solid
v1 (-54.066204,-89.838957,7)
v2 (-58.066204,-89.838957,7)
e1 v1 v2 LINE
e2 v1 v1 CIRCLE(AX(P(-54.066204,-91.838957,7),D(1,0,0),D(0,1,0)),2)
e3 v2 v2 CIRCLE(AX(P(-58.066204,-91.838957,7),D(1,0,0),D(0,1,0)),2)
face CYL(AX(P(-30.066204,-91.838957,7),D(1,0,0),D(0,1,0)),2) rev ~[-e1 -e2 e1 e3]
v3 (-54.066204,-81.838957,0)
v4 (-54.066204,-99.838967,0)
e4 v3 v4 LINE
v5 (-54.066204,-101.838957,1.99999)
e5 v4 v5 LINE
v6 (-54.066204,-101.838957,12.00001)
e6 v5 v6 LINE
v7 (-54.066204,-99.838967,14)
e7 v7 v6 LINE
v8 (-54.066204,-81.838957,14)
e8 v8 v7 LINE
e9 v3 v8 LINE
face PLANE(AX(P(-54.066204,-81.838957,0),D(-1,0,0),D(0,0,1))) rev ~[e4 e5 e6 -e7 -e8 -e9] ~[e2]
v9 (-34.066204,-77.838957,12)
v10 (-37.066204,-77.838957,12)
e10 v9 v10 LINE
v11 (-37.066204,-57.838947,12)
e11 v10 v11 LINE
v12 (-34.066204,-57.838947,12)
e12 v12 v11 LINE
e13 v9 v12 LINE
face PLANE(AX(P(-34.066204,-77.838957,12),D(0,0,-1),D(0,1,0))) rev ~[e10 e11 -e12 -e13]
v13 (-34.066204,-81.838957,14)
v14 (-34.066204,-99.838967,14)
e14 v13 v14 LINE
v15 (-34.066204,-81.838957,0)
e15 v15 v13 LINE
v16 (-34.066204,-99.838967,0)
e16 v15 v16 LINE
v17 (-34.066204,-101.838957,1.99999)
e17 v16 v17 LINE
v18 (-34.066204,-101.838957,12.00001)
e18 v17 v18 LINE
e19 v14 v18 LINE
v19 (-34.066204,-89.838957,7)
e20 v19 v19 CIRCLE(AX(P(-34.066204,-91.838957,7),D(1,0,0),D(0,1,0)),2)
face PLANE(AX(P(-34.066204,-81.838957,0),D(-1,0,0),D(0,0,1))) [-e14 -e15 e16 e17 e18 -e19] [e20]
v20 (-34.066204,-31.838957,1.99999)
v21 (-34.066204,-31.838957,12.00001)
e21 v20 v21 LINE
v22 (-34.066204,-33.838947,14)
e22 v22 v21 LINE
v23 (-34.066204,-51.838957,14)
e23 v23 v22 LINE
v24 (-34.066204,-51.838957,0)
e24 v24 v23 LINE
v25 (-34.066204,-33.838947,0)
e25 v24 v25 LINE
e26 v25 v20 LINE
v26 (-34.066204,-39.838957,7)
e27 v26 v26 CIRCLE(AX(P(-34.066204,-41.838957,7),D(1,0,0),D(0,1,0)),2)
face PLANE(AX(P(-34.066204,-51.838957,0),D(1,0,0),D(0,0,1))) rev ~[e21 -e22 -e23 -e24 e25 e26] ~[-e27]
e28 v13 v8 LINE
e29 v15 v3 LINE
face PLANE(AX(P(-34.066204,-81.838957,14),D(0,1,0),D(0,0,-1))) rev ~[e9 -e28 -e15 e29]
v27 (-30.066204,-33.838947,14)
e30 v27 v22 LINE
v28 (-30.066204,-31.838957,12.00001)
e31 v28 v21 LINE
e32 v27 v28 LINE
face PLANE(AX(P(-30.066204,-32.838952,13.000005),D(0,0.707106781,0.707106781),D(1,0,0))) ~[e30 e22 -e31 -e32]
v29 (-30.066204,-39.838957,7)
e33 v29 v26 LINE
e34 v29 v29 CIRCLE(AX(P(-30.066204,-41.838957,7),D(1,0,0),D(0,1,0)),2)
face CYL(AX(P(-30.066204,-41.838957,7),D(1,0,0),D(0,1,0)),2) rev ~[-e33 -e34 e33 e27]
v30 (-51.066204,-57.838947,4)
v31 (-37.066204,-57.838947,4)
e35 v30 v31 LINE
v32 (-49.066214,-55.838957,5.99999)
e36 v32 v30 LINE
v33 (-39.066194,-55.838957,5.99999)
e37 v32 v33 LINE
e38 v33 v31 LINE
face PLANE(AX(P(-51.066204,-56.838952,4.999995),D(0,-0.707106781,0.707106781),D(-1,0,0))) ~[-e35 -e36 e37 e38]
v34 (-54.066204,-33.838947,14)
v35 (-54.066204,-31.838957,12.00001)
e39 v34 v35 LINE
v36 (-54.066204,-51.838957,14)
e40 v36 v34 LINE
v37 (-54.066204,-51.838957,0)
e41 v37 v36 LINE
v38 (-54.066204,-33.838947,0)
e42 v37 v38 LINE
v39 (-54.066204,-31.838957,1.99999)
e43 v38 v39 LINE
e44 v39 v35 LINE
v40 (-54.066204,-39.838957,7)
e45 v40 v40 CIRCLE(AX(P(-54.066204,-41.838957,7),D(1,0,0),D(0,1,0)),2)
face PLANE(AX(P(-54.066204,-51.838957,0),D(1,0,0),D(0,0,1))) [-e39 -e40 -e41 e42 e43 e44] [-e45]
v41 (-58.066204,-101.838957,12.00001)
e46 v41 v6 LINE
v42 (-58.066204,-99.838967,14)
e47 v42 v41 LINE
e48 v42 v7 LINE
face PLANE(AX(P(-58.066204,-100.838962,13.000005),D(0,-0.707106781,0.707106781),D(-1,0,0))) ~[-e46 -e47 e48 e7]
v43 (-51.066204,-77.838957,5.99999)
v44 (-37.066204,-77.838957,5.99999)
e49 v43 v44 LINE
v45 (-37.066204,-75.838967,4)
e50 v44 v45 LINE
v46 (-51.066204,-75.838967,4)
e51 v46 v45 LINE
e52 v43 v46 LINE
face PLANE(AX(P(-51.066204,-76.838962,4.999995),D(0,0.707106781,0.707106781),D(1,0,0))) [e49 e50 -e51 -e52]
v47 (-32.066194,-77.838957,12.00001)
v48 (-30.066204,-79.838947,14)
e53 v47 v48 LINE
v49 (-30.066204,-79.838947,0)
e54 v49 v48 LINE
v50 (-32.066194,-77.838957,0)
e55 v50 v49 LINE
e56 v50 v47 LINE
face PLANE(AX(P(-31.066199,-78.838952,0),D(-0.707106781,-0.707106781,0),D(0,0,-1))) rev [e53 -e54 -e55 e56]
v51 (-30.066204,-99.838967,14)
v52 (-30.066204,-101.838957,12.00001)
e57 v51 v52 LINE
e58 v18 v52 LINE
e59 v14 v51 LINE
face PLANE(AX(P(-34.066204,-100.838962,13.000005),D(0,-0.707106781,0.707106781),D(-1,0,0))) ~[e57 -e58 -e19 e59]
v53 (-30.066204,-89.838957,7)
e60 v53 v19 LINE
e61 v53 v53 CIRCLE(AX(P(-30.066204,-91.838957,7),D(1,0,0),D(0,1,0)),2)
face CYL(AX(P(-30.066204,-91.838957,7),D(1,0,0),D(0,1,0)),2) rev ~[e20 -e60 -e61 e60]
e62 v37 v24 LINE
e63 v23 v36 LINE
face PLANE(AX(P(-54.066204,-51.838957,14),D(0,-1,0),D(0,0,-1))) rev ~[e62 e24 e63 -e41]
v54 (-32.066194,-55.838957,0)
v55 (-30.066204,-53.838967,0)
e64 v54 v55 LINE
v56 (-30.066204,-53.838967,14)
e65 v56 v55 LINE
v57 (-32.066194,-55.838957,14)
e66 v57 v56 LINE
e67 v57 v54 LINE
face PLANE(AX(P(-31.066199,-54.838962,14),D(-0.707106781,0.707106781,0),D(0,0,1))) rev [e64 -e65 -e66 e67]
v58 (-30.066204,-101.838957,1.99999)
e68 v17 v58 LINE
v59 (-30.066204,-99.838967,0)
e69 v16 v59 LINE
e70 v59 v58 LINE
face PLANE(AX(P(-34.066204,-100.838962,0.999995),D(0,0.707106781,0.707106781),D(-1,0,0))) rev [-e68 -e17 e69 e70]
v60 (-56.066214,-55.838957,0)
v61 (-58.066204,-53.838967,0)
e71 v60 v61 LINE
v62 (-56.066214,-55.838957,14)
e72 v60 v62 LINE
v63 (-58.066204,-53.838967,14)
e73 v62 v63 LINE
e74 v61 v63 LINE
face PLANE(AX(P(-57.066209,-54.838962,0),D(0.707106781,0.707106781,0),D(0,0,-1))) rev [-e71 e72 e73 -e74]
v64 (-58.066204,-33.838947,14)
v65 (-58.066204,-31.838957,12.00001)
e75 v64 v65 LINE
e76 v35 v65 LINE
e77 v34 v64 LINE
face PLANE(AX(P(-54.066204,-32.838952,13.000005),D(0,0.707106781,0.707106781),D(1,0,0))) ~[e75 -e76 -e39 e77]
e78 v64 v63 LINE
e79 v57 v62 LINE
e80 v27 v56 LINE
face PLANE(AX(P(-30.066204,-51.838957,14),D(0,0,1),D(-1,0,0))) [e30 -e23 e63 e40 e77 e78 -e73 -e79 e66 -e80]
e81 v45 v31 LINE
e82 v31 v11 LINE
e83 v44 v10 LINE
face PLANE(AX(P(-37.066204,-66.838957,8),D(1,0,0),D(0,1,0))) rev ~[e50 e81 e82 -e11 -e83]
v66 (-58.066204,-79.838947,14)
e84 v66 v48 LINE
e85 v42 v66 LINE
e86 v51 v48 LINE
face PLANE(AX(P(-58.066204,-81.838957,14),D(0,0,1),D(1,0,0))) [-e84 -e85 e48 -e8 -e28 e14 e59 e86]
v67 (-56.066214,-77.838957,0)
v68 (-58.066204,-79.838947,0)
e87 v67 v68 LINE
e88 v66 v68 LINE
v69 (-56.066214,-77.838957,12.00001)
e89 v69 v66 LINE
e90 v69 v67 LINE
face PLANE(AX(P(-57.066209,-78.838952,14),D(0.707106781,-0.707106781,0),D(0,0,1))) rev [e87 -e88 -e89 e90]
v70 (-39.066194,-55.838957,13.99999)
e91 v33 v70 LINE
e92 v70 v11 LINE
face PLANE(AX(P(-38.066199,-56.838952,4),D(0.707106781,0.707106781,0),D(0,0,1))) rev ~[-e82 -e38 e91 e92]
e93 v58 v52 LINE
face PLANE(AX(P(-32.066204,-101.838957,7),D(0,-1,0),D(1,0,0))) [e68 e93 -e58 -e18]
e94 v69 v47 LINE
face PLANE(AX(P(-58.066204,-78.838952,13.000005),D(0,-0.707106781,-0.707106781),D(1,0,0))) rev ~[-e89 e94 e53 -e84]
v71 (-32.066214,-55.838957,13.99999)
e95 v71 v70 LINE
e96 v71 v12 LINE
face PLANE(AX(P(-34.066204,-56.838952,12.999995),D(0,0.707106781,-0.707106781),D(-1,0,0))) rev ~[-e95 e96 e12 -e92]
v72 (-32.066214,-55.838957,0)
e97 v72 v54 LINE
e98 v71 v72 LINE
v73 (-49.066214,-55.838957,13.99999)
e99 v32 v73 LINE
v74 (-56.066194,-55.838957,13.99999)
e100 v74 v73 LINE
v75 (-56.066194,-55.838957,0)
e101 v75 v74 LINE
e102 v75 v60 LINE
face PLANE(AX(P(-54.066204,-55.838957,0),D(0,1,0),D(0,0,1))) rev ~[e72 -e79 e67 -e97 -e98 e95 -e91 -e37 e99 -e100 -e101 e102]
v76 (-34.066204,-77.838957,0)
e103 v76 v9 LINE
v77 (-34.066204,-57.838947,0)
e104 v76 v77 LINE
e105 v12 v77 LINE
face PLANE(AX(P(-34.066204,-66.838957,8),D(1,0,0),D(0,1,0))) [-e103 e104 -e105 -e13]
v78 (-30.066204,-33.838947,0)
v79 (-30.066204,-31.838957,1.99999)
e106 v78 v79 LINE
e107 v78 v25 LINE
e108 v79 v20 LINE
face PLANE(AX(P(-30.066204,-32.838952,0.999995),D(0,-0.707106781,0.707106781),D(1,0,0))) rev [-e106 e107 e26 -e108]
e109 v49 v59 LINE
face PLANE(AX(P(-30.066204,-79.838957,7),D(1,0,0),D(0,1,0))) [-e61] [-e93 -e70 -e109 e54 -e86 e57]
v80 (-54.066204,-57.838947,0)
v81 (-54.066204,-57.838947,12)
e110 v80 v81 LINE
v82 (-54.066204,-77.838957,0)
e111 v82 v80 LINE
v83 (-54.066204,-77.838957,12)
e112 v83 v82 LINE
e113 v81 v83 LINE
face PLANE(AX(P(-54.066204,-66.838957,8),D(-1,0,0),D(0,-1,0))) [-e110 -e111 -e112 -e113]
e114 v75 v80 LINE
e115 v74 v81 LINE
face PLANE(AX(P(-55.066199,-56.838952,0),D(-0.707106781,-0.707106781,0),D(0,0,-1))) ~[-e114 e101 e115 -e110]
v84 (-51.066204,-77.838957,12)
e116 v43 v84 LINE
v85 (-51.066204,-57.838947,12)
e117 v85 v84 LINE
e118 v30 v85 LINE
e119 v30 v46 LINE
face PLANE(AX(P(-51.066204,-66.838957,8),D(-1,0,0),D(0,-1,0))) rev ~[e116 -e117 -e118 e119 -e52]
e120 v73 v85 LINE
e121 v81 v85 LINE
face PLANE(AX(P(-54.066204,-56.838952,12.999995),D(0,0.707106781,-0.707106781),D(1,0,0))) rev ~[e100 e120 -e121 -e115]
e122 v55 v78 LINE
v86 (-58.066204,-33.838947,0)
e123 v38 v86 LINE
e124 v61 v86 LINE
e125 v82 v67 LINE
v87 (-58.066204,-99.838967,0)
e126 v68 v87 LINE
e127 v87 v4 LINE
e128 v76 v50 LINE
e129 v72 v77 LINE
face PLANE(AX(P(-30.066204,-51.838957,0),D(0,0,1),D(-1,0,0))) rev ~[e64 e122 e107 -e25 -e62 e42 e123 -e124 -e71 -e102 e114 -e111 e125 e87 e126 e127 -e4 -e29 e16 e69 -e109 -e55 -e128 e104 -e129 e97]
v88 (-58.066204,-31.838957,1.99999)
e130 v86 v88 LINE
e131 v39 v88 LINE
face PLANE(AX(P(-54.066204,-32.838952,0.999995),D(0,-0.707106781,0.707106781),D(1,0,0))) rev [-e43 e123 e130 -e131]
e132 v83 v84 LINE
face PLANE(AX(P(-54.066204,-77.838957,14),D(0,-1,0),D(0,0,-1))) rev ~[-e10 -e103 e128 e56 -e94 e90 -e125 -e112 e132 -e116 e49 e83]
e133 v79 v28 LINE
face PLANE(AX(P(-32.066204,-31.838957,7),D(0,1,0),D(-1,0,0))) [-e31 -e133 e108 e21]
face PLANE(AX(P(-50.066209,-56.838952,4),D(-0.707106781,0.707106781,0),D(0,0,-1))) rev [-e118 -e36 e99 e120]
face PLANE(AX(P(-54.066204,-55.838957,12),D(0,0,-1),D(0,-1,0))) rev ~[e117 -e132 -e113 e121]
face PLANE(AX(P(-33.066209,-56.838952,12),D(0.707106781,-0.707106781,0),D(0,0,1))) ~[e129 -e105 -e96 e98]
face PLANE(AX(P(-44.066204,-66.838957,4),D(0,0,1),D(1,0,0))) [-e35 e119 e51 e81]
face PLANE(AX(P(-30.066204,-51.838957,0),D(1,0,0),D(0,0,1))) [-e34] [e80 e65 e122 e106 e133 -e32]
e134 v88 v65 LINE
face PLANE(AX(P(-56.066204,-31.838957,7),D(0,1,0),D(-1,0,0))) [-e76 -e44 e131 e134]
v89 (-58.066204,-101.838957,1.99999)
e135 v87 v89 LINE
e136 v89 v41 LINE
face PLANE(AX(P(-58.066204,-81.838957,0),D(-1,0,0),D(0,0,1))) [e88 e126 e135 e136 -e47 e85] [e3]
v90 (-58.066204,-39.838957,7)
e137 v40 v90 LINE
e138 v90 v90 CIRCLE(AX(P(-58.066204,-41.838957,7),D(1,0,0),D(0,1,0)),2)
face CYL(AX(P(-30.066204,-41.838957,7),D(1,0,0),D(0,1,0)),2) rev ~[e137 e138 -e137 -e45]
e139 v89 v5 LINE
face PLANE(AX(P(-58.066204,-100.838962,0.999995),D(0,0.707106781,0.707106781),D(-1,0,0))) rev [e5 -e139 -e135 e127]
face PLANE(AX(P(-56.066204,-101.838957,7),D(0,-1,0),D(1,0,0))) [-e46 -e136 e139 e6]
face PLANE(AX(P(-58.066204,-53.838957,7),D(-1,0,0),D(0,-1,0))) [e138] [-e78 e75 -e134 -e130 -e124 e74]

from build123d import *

# Parameters (mm, degrees)
F0_W            = 20
F0_H            = 22
F0_H_2          = 4
F0_H_3          = 20.4
F1_DEPTH        = 2
F2_DEPTH        = 10
F3_R            = 2.2
F4_DEPTH        = 30
F5_W            = 20
F5_H            = 12
F5_R            = 2.6
F7_DEPTH        = 4
F6_W            = 20
F6_H            = 12
F6_R            = 2.6
F8_DEPTH        = 4
F9_T1_DEPTH     = 25
F9_T3_DEPTH     = 57.4
F9_T5_DEPTH     = 16
F9_T7_DEPTH     = 48.4
F9_T9_DEPTH     = 2
F9_T11_DEPTH    = 20
F9_T13_DEPTH    = 7
F9_T15_DEPTH    = 25
F9_T17_DEPTH    = 14
F9_T19_DEPTH    = 27
F9_T21_DEPTH    = 14
F9_T23_DEPTH    = 30
F9_T25_DEPTH    = 7
F9_T27_DEPTH    = 8
F9_S31_W        = 2
F9_S31_H        = 2
F9_T32_DEPTH    = 2
F9_S37_W        = 2
F9_S37_H        = 2
F9_T38_DEPTH    = 2
F9_S43_W        = 2
F9_S43_H        = 2
F9_T44_DEPTH    = 2
F9_S49_W        = 2
F9_S49_H        = 2
F9_T50_DEPTH    = 2
F9_S55_W        = 2
F9_S55_H        = 2
F9_T56_DEPTH    = 2
F9_S61_W        = 2
F9_S61_H        = 2
F9_T62_DEPTH    = 2
F9_S67_W        = 2
F9_S67_H        = 2
F9_T68_DEPTH    = 2
F9_S73_W        = 2
F9_S73_H        = 2
F9_T74_DEPTH    = 2
F9_T81_DEPTH    = 30
F9_T85_DEPTH    = 30
F9_T92_DEPTH    = 7
F9_T96_DEPTH    = 53.4
F9_T103_DEPTH   = 30
F9_T107_DEPTH   = 30
F9_S1_T1_DEPTH  = 7
F9_S1_T3_DEPTH  = 30
F9_S1_T5_DEPTH  = 16
F9_S1_T7_DEPTH  = 8
F9_S1_S11_W     = 2
F9_S1_S11_H     = 2
F9_S1_T12_DEPTH = 2
F9_S1_S17_W     = 2
F9_S1_S17_H     = 2
F9_S1_T18_DEPTH = 2
F9_S1_S23_W     = 2
F9_S1_S23_H     = 2
F9_S1_T24_DEPTH = 2
F9_S1_S29_W     = 2
F9_S1_S29_H     = 2
F9_S1_T30_DEPTH = 2
F10_W           = 20
F10_H           = 30
F11_DEPTH       = 4
F12_W           = 20
F12_H           = 4
F13_DEPTH       = 10
F16_DEPTH       = 4
F17_DEPTH       = 4
F19_W           = 4
F19_H           = 14
F20_DEPTH       = 20
F18_W           = 4
F18_H           = 14
F21_DEPTH       = 20
F22_W           = 22
F22_H           = 8
F23_DEPTH       = 3
F24_W           = 22
F24_H           = 8
F25_DEPTH       = 3
F26_R           = 2
F27_R           = 2
F28_DEPTH       = 28.3421242009
F29_SIZE        = 1.99999


# Not quite as in the source:
# - a fillet or chamfer that OpenCascade refuses, or shapes differently, is made with other operations: its cross-section is extruded or revolved along the edge and cut away or added
# - a fillet or chamfer is up to 0.001 mm smaller than in the source, because OpenCascade refuses the exact size
# - a feature names something its author has since deleted; it is built from what else it names


with BuildPart() as f1:
    # F0 (on Top) → F1 (new body)
    with BuildSketch(Plane.XY):
        with Locations((-44.4073281825, 48.6883277684)):
            Rectangle(F0_W, F0_H)
        with Locations((-44.4073281825, 61.6883277684)):
            Rectangle(F0_W, F0_H_2)
        with Locations((-44.4073281825, 35.6883277684)):
            Rectangle(F0_W, F0_H_2)
        with Locations((-44.4073281825, 23.4883277684)):
            Rectangle(F0_W, F0_H_3)
        with Locations((-44.4073281825, 11.2883277684)):
            Rectangle(F0_W, F0_H_2)
    extrude(amount=-F1_DEPTH)

    # F0 (on Top) → F2 (join)
    with BuildSketch(Plane.XY):
        with Locations((-44.4073281825, 35.6883277684)):
            Rectangle(F0_W, F0_H_2)
        with Locations((-44.4073281825, 61.6883277684)):
            Rectangle(F0_W, F0_H_2)
        with Locations((-44.4073281825, 11.2883277684)):
            Rectangle(F0_W, F0_H_2)
    extrude(amount=F2_DEPTH)

    # F3 (on face) → F4 (cut)
    with BuildSketch(Plane.XZ.offset(-9.2883277684)):
        with Locations((-44.4073281825, 5.5)):
            Circle(F3_R)
    extrude(amount=-F4_DEPTH, mode=Mode.SUBTRACT)

    # F5 (on face) → F7 (join)
    with BuildSketch(Plane(origin=(-54.4073281825, 0, 0), x_dir=(0, -1, 0), z_dir=(-1, 0, 0))):
        with Locations((-73.6883277684, 4)):
            Rectangle(F5_W, F5_H)
        with Locations((-73.6883277684, 4)):
            Circle(F5_R, mode=Mode.SUBTRACT)
    extrude(amount=F7_DEPTH)

    # F6 (on face) → F8 (join)
    with BuildSketch(Plane.YZ.offset(-34.4073281825)):
        with Locations((73.6883277684, 4)):
            Rectangle(F6_W, F6_H)
        with Locations((73.6883277684, 4)):
            Circle(F6_R, mode=Mode.SUBTRACT)
        Polygon((63.6883277684, 10), (59.6883277684, 10), (59.6883277684, 0), (59.6883277684, -2), (63.6883277684, -2), align=None)
    extrude(amount=F8_DEPTH)

    # F9: fillet of radius 2 on 26 edges, made by hand

    # F9_s2 → F9_t1 (cut)
    with BuildSketch(Plane.YZ.offset(-59.4073281825)):
        with BuildLine():
            ThreePointArc((63.6883277684, 0), (63.1025413308, -1.4142135624), (61.6883277684, -2))
            Line((61.6883277684, -2), (63.6883277684, -2))
            Line((63.6883277684, -2), (63.6883277684, 0))
        make_face()
        with BuildLine():
            ThreePointArc((63.6883277684, 8), (63.1025413308, 9.4142135624), (61.6883277684, 10))
            Line((61.6883277684, 10), (63.6883277684, 10))
            Line((63.6883277684, 10), (63.6883277684, 8))
        make_face()
    extrude(amount=F9_T1_DEPTH, mode=Mode.SUBTRACT)

    # F9_s4 → F9_t3 (cut)
    with BuildSketch(Plane.XZ.offset(-68.6883277684)):
        with BuildLine():
            ThreePointArc((-54.4073281825, 0), (-53.8215417448, -1.4142135624), (-52.4073281825, -2))
            Line((-52.4073281825, -2), (-54.4073281825, -2))
            Line((-54.4073281825, -2), (-54.4073281825, 0))
        make_face()
    extrude(amount=F9_T3_DEPTH, mode=Mode.SUBTRACT)

    # F9_s6 → F9_t5 (cut)
    with BuildSketch(Plane.YZ.offset(-52.4073281825)):
        with BuildLine():
            ThreePointArc((9.2883277684, 0), (9.8741142061, -1.4142135624), (11.2883277684, -2))
            Line((11.2883277684, -2), (9.2883277684, -2))
            Line((9.2883277684, -2), (9.2883277684, 0))
        make_face()
        with BuildLine():
            ThreePointArc((9.2883277684, 8), (9.8741142061, 9.4142135624), (11.2883277684, 10))
            Line((11.2883277684, 10), (9.2883277684, 10))
            Line((9.2883277684, 10), (9.2883277684, 8))
        make_face()
    extrude(amount=F9_T5_DEPTH, mode=Mode.SUBTRACT)

    # F9_s8 → F9_t7 (cut)
    with BuildSketch(Plane.XZ.offset(-59.6883277684)):
        with BuildLine():
            ThreePointArc((-34.4073281825, 0), (-34.9931146201, -1.4142135624), (-36.4073281825, -2))
            Line((-36.4073281825, -2), (-34.4073281825, -2))
            Line((-34.4073281825, -2), (-34.4073281825, 0))
        make_face()
    extrude(amount=F9_T7_DEPTH, mode=Mode.SUBTRACT)

    # F9_s10 → F9_t9 (cut)
    with BuildSketch(Plane.YZ.offset(-34.4073281825)):
        with BuildLine():
            ThreePointArc((59.6883277684, 0), (60.2741142061, -1.4142135624), (61.6883277684, -2))
            Line((61.6883277684, -2), (59.6883277684, -2))
            Line((59.6883277684, -2), (59.6883277684, 0))
        make_face()
    extrude(amount=F9_T9_DEPTH, mode=Mode.SUBTRACT)

    # F9_s12 → F9_t11 (cut)
    with BuildSketch(Plane.XZ.offset(-81.6883277684)):
        with BuildLine():
            ThreePointArc((-30.4073281825, 0), (-30.9931146201, -1.4142135624), (-32.4073281825, -2))
            Line((-32.4073281825, -2), (-30.4073281825, -2))
            Line((-30.4073281825, -2), (-30.4073281825, 0))
        make_face()
        with BuildLine():
            ThreePointArc((-30.4073281825, 8), (-30.9931146201, 9.4142135624), (-32.4073281825, 10))
            Line((-32.4073281825, 10), (-30.4073281825, 10))
            Line((-30.4073281825, 10), (-30.4073281825, 8))
        make_face()
    extrude(amount=F9_T11_DEPTH, mode=Mode.SUBTRACT)

    # F9_s14 → F9_t13 (cut)
    with BuildSketch(Plane.YZ.offset(-39.4073281825)):
        with BuildLine():
            ThreePointArc((83.6883277684, 0), (83.1025413308, -1.4142135624), (81.6883277684, -2))
            Line((81.6883277684, -2), (83.6883277684, -2))
            Line((83.6883277684, -2), (83.6883277684, 0))
        make_face()
        with BuildLine():
            ThreePointArc((83.6883277684, 8), (83.1025413308, 9.4142135624), (81.6883277684, 10))
            Line((81.6883277684, 10), (83.6883277684, 10))
            Line((83.6883277684, 10), (83.6883277684, 8))
        make_face()
    extrude(amount=F9_T13_DEPTH, mode=Mode.SUBTRACT)

    # F9_s16 → F9_t15 (cut)
    with BuildSketch(Plane.XZ.offset(-88.6883277684)):
        with BuildLine():
            ThreePointArc((-34.4073281825, 0), (-33.8215417448, -1.4142135624), (-32.4073281825, -2))
            Line((-32.4073281825, -2), (-34.4073281825, -2))
            Line((-34.4073281825, -2), (-34.4073281825, 0))
        make_face()
        with BuildLine():
            ThreePointArc((-34.4073281825, 8), (-33.8215417448, 9.4142135624), (-32.4073281825, 10))
            Line((-32.4073281825, 10), (-34.4073281825, 10))
            Line((-34.4073281825, 10), (-34.4073281825, 8))
        make_face()
    extrude(amount=F9_T15_DEPTH, mode=Mode.SUBTRACT)

    # F9_s18 → F9_t17 (cut)
    with BuildSketch(Plane.XZ.offset(-68.6883277684)):
        with BuildLine():
            ThreePointArc((-52.4073281825, 10), (-53.8215417448, 9.4142135624), (-54.4073281825, 8))
            Line((-54.4073281825, 8), (-54.4073281825, 10))
            Line((-54.4073281825, 10), (-52.4073281825, 10))
        make_face()
    extrude(amount=F9_T17_DEPTH, mode=Mode.SUBTRACT)

    # F9_s20 → F9_t19 (cut)
    with BuildSketch(Plane.YZ.offset(-59.4073281825)):
        with BuildLine():
            ThreePointArc((59.6883277684, 8), (60.2741142061, 9.4142135624), (61.6883277684, 10))
            Line((61.6883277684, 10), (59.6883277684, 10))
            Line((59.6883277684, 10), (59.6883277684, 8))
        make_face()
    extrude(amount=F9_T19_DEPTH, mode=Mode.SUBTRACT)

    # F9_s22 → F9_t21 (cut)
    with BuildSketch(Plane.XZ.offset(-42.6883277684)):
        with BuildLine():
            ThreePointArc((-52.4073281825, 10), (-53.8215417448, 9.4142135624), (-54.4073281825, 8))
            Line((-54.4073281825, 8), (-54.4073281825, 10))
            Line((-54.4073281825, 10), (-52.4073281825, 10))
        make_face()
        with BuildLine():
            ThreePointArc((-36.4073281825, 10), (-34.9931146201, 9.4142135624), (-34.4073281825, 8))
            Line((-34.4073281825, 8), (-34.4073281825, 10))
            Line((-34.4073281825, 10), (-36.4073281825, 10))
        make_face()
    extrude(amount=F9_T21_DEPTH, mode=Mode.SUBTRACT)

    # F9_s24 → F9_t23 (cut)
    with BuildSketch(Plane.YZ.offset(-59.4073281825)):
        with BuildLine():
            ThreePointArc((33.6883277684, 8), (34.2741142061, 9.4142135624), (35.6883277684, 10))
            Line((35.6883277684, 10), (33.6883277684, 10))
            Line((33.6883277684, 10), (33.6883277684, 8))
        make_face()
        with BuildLine():
            ThreePointArc((37.6883277684, 8), (37.1025413308, 9.4142135624), (35.6883277684, 10))
            Line((35.6883277684, 10), (37.6883277684, 10))
            Line((37.6883277684, 10), (37.6883277684, 8))
        make_face()
        with BuildLine():
            ThreePointArc((13.2883277684, 8), (12.7025413308, 9.4142135624), (11.2883277684, 10))
            Line((11.2883277684, 10), (13.2883277684, 10))
            Line((13.2883277684, 10), (13.2883277684, 8))
        make_face()
    extrude(amount=F9_T23_DEPTH, mode=Mode.SUBTRACT)

    # F9_s26 → F9_t25 (cut)
    with BuildSketch(Plane.XZ.offset(-18.2883277684)):
        with BuildLine():
            ThreePointArc((-36.4073281825, 10), (-34.9931146201, 9.4142135624), (-34.4073281825, 8))
            Line((-34.4073281825, 8), (-34.4073281825, 10))
            Line((-34.4073281825, 10), (-36.4073281825, 10))
        make_face()
        with BuildLine():
            ThreePointArc((-52.4073281825, 10), (-53.8215417448, 9.4142135624), (-54.4073281825, 8))
            Line((-54.4073281825, 8), (-54.4073281825, 10))
            Line((-54.4073281825, 10), (-52.4073281825, 10))
        make_face()
    extrude(amount=F9_T25_DEPTH, mode=Mode.SUBTRACT)

    # F9_s28 → F9_t27 (cut)
    with BuildSketch(Plane.XY):
        with BuildLine():
            ThreePointArc((-36.4073281825, 9.2883277684), (-34.9931146201, 9.8741142061), (-34.4073281825, 11.2883277684))
            Line((-34.4073281825, 11.2883277684), (-34.4073281825, 9.2883277684))
            Line((-34.4073281825, 9.2883277684), (-36.4073281825, 9.2883277684))
        make_face()
        with BuildLine():
            ThreePointArc((-52.4073281825, 9.2883277684), (-53.8215417448, 9.8741142061), (-54.4073281825, 11.2883277684))
            Line((-54.4073281825, 11.2883277684), (-54.4073281825, 9.2883277684))
            Line((-54.4073281825, 9.2883277684), (-52.4073281825, 9.2883277684))
        make_face()
        with BuildLine():
            ThreePointArc((-30.4073281825, 61.6883277684), (-30.9931146201, 60.2741142061), (-32.4073281825, 59.6883277684))
            Line((-32.4073281825, 59.6883277684), (-30.4073281825, 59.6883277684))
            Line((-30.4073281825, 59.6883277684), (-30.4073281825, 61.6883277684))
        make_face()
        with BuildLine():
            ThreePointArc((-30.4073281825, 81.6883277684), (-30.9931146201, 83.1025413308), (-32.4073281825, 83.6883277684))
            Line((-32.4073281825, 83.6883277684), (-30.4073281825, 83.6883277684))
            Line((-30.4073281825, 83.6883277684), (-30.4073281825, 81.6883277684))
        make_face()
    extrude(amount=F9_T27_DEPTH, mode=Mode.SUBTRACT)


with BuildPart() as f9_tool30:
    # F9_s31 → F9_t32 (new body)
    with BuildSketch(Plane.YZ.offset(-52.4073281825)):
        with Locations((10.2883277684, -1)):
            Rectangle(F9_S31_W, F9_S31_H)
    extrude(amount=-F9_T32_DEPTH)

    # F9_s33 → F9_t34 (revolve, cut)
    with BuildSketch(Plane(origin=(-52.4073281825, 11.2883277684, 0), x_dir=(0, 0.7071067812, 0.7071067812), z_dir=(0, -0.7071067812, 0.7071067812))):
        with BuildLine():
            ThreePointArc((0, -2), (2, 0), (0, 2))
            Line((0, 2), (0, -2))
        make_face()
    revolve(axis=Axis((-52.4073281825, 11.2883277684, 0), (-1, 0, 0)), mode=Mode.SUBTRACT)


with BuildPart() as f1_1:
    add(f1.part)

    # F9_t29: cut F9_tool30
    add(f9_tool30.part, mode=Mode.SUBTRACT)


with BuildPart() as f9_tool36:
    # F9_s37 → F9_t38 (new body)
    with BuildSketch(Plane.XY):
        with Locations((-35.4073281825, 10.2883277684)):
            Rectangle(F9_S37_W, F9_S37_H)
    extrude(amount=-F9_T38_DEPTH)

    # F9_s39 → F9_t40 (revolve, cut)
    with BuildSketch(Plane(origin=(-36.4073281825, 11.2883277684, 0), x_dir=(-0.7071067812, 0.7071067812, 0), z_dir=(-0.7071067812, -0.7071067812, 0))):
        with BuildLine():
            ThreePointArc((0, -2), (2, 0), (0, 2))
            Line((0, 2), (0, -2))
        make_face()
    revolve(axis=Axis((-36.4073281825, 11.2883277684, 0), (0, 0, -1)), mode=Mode.SUBTRACT)


with BuildPart() as f1_2:
    add(f1_1.part)

    # F9_t35: cut F9_tool36
    add(f9_tool36.part, mode=Mode.SUBTRACT)


with BuildPart() as f9_tool42:
    # F9_s43 → F9_t44 (new body)
    with BuildSketch(Plane.YZ.offset(-32.4073281825)):
        with Locations((60.6883277684, -1)):
            Rectangle(F9_S43_W, F9_S43_H)
    extrude(amount=F9_T44_DEPTH)

    # F9_s45 → F9_t46 (revolve, cut)
    with BuildSketch(Plane(origin=(-32.4073281825, 61.6883277684, 0), x_dir=(0, 0.7071067812, 0.7071067812), z_dir=(0, 0.7071067812, -0.7071067812))):
        with BuildLine():
            ThreePointArc((0, -2), (2, 0), (0, 2))
            Line((0, 2), (0, -2))
        make_face()
    revolve(axis=Axis((-32.4073281825, 61.6883277684, 0), (1, 0, 0)), mode=Mode.SUBTRACT)


with BuildPart() as f1_3:
    add(f1_2.part)

    # F9_t41: cut F9_tool42
    add(f9_tool42.part, mode=Mode.SUBTRACT)


with BuildPart() as f9_tool48:
    # F9_s49 → F9_t50 (new body)
    with BuildSketch(Plane.XY):
        with Locations((-31.4073281825, 82.6883277684)):
            Rectangle(F9_S49_W, F9_S49_H)
    extrude(amount=-F9_T50_DEPTH)

    # F9_s51 → F9_t52 (revolve, cut)
    with BuildSketch(Plane(origin=(-32.4073281825, 81.6883277684, 0), x_dir=(-0.7071067812, -0.7071067812, 0), z_dir=(0.7071067812, -0.7071067812, 0))):
        with BuildLine():
            ThreePointArc((0, -2), (2, 0), (0, 2))
            Line((0, 2), (0, -2))
        make_face()
    revolve(axis=Axis((-32.4073281825, 81.6883277684, 0), (0, 0, -1)), mode=Mode.SUBTRACT)


with BuildPart() as f1_4:
    add(f1_3.part)

    # F9_t47: cut F9_tool48
    add(f9_tool48.part, mode=Mode.SUBTRACT)


with BuildPart() as f9_tool54:
    # F9_s55 → F9_t56 (new body)
    with BuildSketch(Plane.XY.offset(8)):
        with Locations((-31.4073281825, 60.6883277684)):
            Rectangle(F9_S55_W, F9_S55_H)
    extrude(amount=F9_T56_DEPTH)

    # F9_s57 → F9_t58 (revolve, cut)
    with BuildSketch(Plane(origin=(-32.4073281825, 61.6883277684, 8), x_dir=(-0.7071067812, 0.7071067812, 0), z_dir=(0.7071067812, 0.7071067812, 0))):
        with BuildLine():
            ThreePointArc((0, -2), (2, 0), (0, 2))
            Line((0, 2), (0, -2))
        make_face()
    revolve(axis=Axis((-32.4073281825, 61.6883277684, 8), (0, 0, 1)), mode=Mode.SUBTRACT)


with BuildPart() as f1_5:
    add(f1_4.part)

    # F9_t53: cut F9_tool54
    add(f9_tool54.part, mode=Mode.SUBTRACT)


with BuildPart() as f9_tool60:
    # F9_s61 → F9_t62 (new body)
    with BuildSketch(Plane.XZ.offset(-81.6883277684)):
        with Locations((-31.4073281825, 9)):
            Rectangle(F9_S61_W, F9_S61_H)
    extrude(amount=-F9_T62_DEPTH)

    # F9_s63 → F9_t64 (revolve, cut)
    with BuildSketch(Plane(origin=(-32.4073281825, 81.6883277684, 8), x_dir=(-0.7071067812, 0, -0.7071067812), z_dir=(0.7071067812, 0, -0.7071067812))):
        with BuildLine():
            ThreePointArc((0, -2), (2, 0), (0, 2))
            Line((0, 2), (0, -2))
        make_face()
    revolve(axis=Axis((-32.4073281825, 81.6883277684, 8), (0, 1, 0)), mode=Mode.SUBTRACT)


with BuildPart() as f1_6:
    add(f1_5.part)

    # F9_t59: cut F9_tool60
    add(f9_tool60.part, mode=Mode.SUBTRACT)


with BuildPart() as f9_tool66:
    # F9_s67 → F9_t68 (new body)
    with BuildSketch(Plane.XZ.offset(-11.2883277684)):
        with Locations((-35.4073281825, 9)):
            Rectangle(F9_S67_W, F9_S67_H)
    extrude(amount=F9_T68_DEPTH)

    # F9_s69 → F9_t70 (revolve, cut)
    with BuildSketch(Plane(origin=(-36.4073281825, 11.2883277684, 8), x_dir=(-0.7071067812, 0, -0.7071067812), z_dir=(-0.7071067812, 0, 0.7071067812))):
        with BuildLine():
            ThreePointArc((0, -2), (2, 0), (0, 2))
            Line((0, 2), (0, -2))
        make_face()
    revolve(axis=Axis((-36.4073281825, 11.2883277684, 8), (0, -1, 0)), mode=Mode.SUBTRACT)


with BuildPart() as f1_7:
    add(f1_6.part)

    # F9_t65: cut F9_tool66
    add(f9_tool66.part, mode=Mode.SUBTRACT)


with BuildPart() as f9_tool72:
    # F9_s73 → F9_t74 (new body)
    with BuildSketch(Plane.YZ.offset(-52.4073281825)):
        with Locations((10.2883277684, 9)):
            Rectangle(F9_S73_W, F9_S73_H)
    extrude(amount=-F9_T74_DEPTH)

    # F9_s75 → F9_t76 (revolve, cut)
    with BuildSketch(Plane(origin=(-52.4073281825, 11.2883277684, 8), x_dir=(0, 0.7071067812, -0.7071067812), z_dir=(0, 0.7071067812, 0.7071067812))):
        with BuildLine():
            ThreePointArc((0, -2), (2, 0), (0, 2))
            Line((0, 2), (0, -2))
        make_face()
    revolve(axis=Axis((-52.4073281825, 11.2883277684, 8), (-1, 0, 0)), mode=Mode.SUBTRACT)


with BuildPart() as f1_8:
    add(f1_7.part)

    # F9_t71: cut F9_tool72
    add(f9_tool72.part, mode=Mode.SUBTRACT)


with BuildPart() as f9_tool79:
    # F9_s80 → F9_t81 (new body)
    with BuildSketch(Plane.YZ.offset(-29.4073281825)):
        with BuildLine():
            ThreePointArc((63.6883277684, 0), (63.1025413308, -1.4142135624), (61.6883277684, -2))
            Line((61.6883277684, -2), (63.6883277684, -2))
            Line((63.6883277684, -2), (63.6883277684, 0))
        make_face()
    extrude(amount=-F9_T81_DEPTH)

    split(bisect_by=Plane.YZ.offset(-34.4073281825), keep=Keep.TOP)


with BuildPart() as f9_tool83:
    # F9_s84 → F9_t85 (new body)
    with BuildSketch(Plane.XZ.offset(-58.6883277684)):
        with BuildLine():
            ThreePointArc((-34.4073281825, 0), (-33.8215417448, -1.4142135624), (-32.4073281825, -2))
            Line((-32.4073281825, -2), (-34.4073281825, -2))
            Line((-34.4073281825, -2), (-34.4073281825, 0))
        make_face()
    extrude(amount=-F9_T85_DEPTH)

    split(bisect_by=Plane.XZ.offset(-63.6883277684), keep=Keep.TOP)


with BuildPart() as f9_tool79_1:
    add(f9_tool79.part)

    # F9_t87: intersect F9_tool83
    add(f9_tool83.part, mode=Mode.INTERSECT)


with BuildPart() as f1_9:
    add(f1_8.part)

    # F9_t77: cut F9_tool79
    add(f9_tool79_1.part, mode=Mode.SUBTRACT)


with BuildPart() as f9_tool90:
    # F9_s91 → F9_t92 (new body)
    with BuildSketch(Plane.YZ.offset(-39.4073281825)):
        with BuildLine():
            ThreePointArc((59.6883277684, 0), (60.2741142061, -1.4142135624), (61.6883277684, -2))
            Line((61.6883277684, -2), (59.6883277684, -2))
            Line((59.6883277684, -2), (59.6883277684, 0))
        make_face()
    extrude(amount=F9_T92_DEPTH)

    split(bisect_by=Plane.YZ.offset(-34.4073281825), keep=Keep.BOTTOM)


with BuildPart() as f9_tool94:
    # F9_s95 → F9_t96 (new body)
    with BuildSketch(Plane.XZ.offset(-11.2883277684)):
        with BuildLine():
            ThreePointArc((-34.4073281825, 0), (-34.9931146201, -1.4142135624), (-36.4073281825, -2))
            Line((-36.4073281825, -2), (-34.4073281825, -2))
            Line((-34.4073281825, -2), (-34.4073281825, 0))
        make_face()
    extrude(amount=-F9_T96_DEPTH)

    split(bisect_by=Plane.XZ.offset(-59.6883277684), keep=Keep.BOTTOM)


with BuildPart() as f9_tool90_1:
    add(f9_tool90.part)

    # F9_t98: intersect F9_tool94
    add(f9_tool94.part, mode=Mode.INTERSECT)


with BuildPart() as f1_10:
    add(f1_9.part)

    # F9_t88: cut F9_tool90
    add(f9_tool90_1.part, mode=Mode.SUBTRACT)


with BuildPart() as f9_tool101:
    # F9_s102 → F9_t103 (new body)
    with BuildSketch(Plane.YZ.offset(-29.4073281825)):
        with BuildLine():
            ThreePointArc((63.6883277684, 8), (63.1025413308, 9.4142135624), (61.6883277684, 10))
            Line((61.6883277684, 10), (63.6883277684, 10))
            Line((63.6883277684, 10), (63.6883277684, 8))
        make_face()
    extrude(amount=-F9_T103_DEPTH)

    split(bisect_by=Plane.YZ.offset(-34.4073281825), keep=Keep.TOP)


with BuildPart() as f9_tool105:
    # F9_s106 → F9_t107 (new body)
    with BuildSketch(Plane.XZ.offset(-88.6883277684)):
        with BuildLine():
            ThreePointArc((-34.4073281825, 8), (-33.8215417448, 9.4142135624), (-32.4073281825, 10))
            Line((-32.4073281825, 10), (-34.4073281825, 10))
            Line((-34.4073281825, 10), (-34.4073281825, 8))
        make_face()
    extrude(amount=F9_T107_DEPTH)

    split(bisect_by=Plane.XZ.offset(-63.6883277684), keep=Keep.TOP)


with BuildPart() as f9_tool101_1:
    add(f9_tool101.part)

    # F9_t109: intersect F9_tool105
    add(f9_tool105.part, mode=Mode.INTERSECT)


with BuildPart() as f1_11:
    add(f1_10.part)

    # F9_t99: cut F9_tool101
    add(f9_tool101_1.part, mode=Mode.SUBTRACT)

    # F9#s1: fillet of radius 2 on 10 edges, made by hand

    # F9_s1_s2 → F9_s1_t1 (cut)
    with BuildSketch(Plane.YZ.offset(-56.4073281825)):
        with BuildLine():
            ThreePointArc((83.6883277684, 0), (83.1025413308, -1.4142135624), (81.6883277684, -2))
            Line((81.6883277684, -2), (83.6883277684, -2))
            Line((83.6883277684, -2), (83.6883277684, 0))
        make_face()
        with BuildLine():
            ThreePointArc((63.6883277684, 0), (64.2741142061, -1.4142135624), (65.6883277684, -2))
            Line((65.6883277684, -2), (63.6883277684, -2))
            Line((63.6883277684, -2), (63.6883277684, 0))
        make_face()
        with BuildLine():
            ThreePointArc((63.6883277684, 8), (64.2741142061, 9.4142135624), (65.6883277684, 10))
            Line((65.6883277684, 10), (63.6883277684, 10))
            Line((63.6883277684, 10), (63.6883277684, 8))
        make_face()
        with BuildLine():
            ThreePointArc((81.6883277684, 10), (83.1025413308, 9.4142135624), (83.6883277684, 8))
            Line((83.6883277684, 8), (83.6883277684, 10))
            Line((83.6883277684, 10), (81.6883277684, 10))
        make_face()
    extrude(amount=F9_S1_T1_DEPTH, mode=Mode.SUBTRACT)

    # F9_s1_s4 → F9_s1_t3 (cut)
    with BuildSketch(Plane.XZ.offset(-88.6883277684)):
        with BuildLine():
            ThreePointArc((-56.4073281825, -2), (-54.9931146201, -1.4142135624), (-54.4073281825, 0))
            Line((-54.4073281825, 0), (-54.4073281825, -2))
            Line((-54.4073281825, -2), (-56.4073281825, -2))
        make_face()
        with BuildLine():
            ThreePointArc((-56.4073281825, 10), (-54.9931146201, 9.4142135624), (-54.4073281825, 8))
            Line((-54.4073281825, 8), (-54.4073281825, 10))
            Line((-54.4073281825, 10), (-56.4073281825, 10))
        make_face()
    extrude(amount=F9_S1_T3_DEPTH, mode=Mode.SUBTRACT)

    # F9_s1_s6 → F9_s1_t5 (cut)
    with BuildSketch(Plane.XZ.offset(-81.6883277684)):
        with BuildLine():
            ThreePointArc((-58.4073281825, 0), (-57.8215417448, -1.4142135624), (-56.4073281825, -2))
            Line((-56.4073281825, -2), (-58.4073281825, -2))
            Line((-58.4073281825, -2), (-58.4073281825, 0))
        make_face()
        with BuildLine():
            ThreePointArc((-56.4073281825, 10), (-57.8215417448, 9.4142135624), (-58.4073281825, 8))
            Line((-58.4073281825, 8), (-58.4073281825, 10))
            Line((-58.4073281825, 10), (-56.4073281825, 10))
        make_face()
    extrude(amount=F9_S1_T5_DEPTH, mode=Mode.SUBTRACT)

    # F9_s1_s8 → F9_s1_t7 (cut)
    with BuildSketch(Plane.XY):
        with BuildLine():
            ThreePointArc((-56.4073281825, 63.6883277684), (-57.8215417448, 64.2741142061), (-58.4073281825, 65.6883277684))
            Line((-58.4073281825, 65.6883277684), (-58.4073281825, 63.6883277684))
            Line((-58.4073281825, 63.6883277684), (-56.4073281825, 63.6883277684))
        make_face()
        with BuildLine():
            ThreePointArc((-56.4073281825, 83.6883277684), (-57.8215417448, 83.1025413308), (-58.4073281825, 81.6883277684))
            Line((-58.4073281825, 81.6883277684), (-58.4073281825, 83.6883277684))
            Line((-58.4073281825, 83.6883277684), (-56.4073281825, 83.6883277684))
        make_face()
    extrude(amount=F9_S1_T7_DEPTH, mode=Mode.SUBTRACT)


with BuildPart() as f9_s1_tool10:
    # F9_s1_s11 → F9_s1_t12 (new body)
    with BuildSketch(Plane.XZ.offset(-81.6883277684)):
        with Locations((-57.4073281825, -1)):
            Rectangle(F9_S1_S11_W, F9_S1_S11_H)
    extrude(amount=-F9_S1_T12_DEPTH)

    # F9_s1_s13 → F9_s1_t14 (revolve, cut)
    with BuildSketch(Plane(origin=(-56.4073281825, 81.6883277684, 0), x_dir=(0.7071067812, 0, 0.7071067812), z_dir=(-0.7071067812, 0, 0.7071067812))):
        with BuildLine():
            ThreePointArc((0, -2), (2, 0), (0, 2))
            Line((0, 2), (0, -2))
        make_face()
    revolve(axis=Axis((-56.4073281825, 81.6883277684, 0), (0, 1, 0)), mode=Mode.SUBTRACT)


with BuildPart() as f1_12:
    add(f1_11.part)

    # F9_s1_t9: cut F9_s1_tool10
    add(f9_s1_tool10.part, mode=Mode.SUBTRACT)


with BuildPart() as f9_s1_tool16:
    # F9_s1_s17 → F9_s1_t18 (new body)
    with BuildSketch(Plane.XZ.offset(-65.6883277684)):
        with Locations((-57.4073281825, -1)):
            Rectangle(F9_S1_S17_W, F9_S1_S17_H)
    extrude(amount=F9_S1_T18_DEPTH)

    # F9_s1_s19 → F9_s1_t20 (revolve, cut)
    with BuildSketch(Plane(origin=(-56.4073281825, 65.6883277684, 0), x_dir=(0.7071067812, 0, 0.7071067812), z_dir=(0.7071067812, 0, -0.7071067812))):
        with BuildLine():
            ThreePointArc((0, -2), (2, 0), (0, 2))
            Line((0, 2), (0, -2))
        make_face()
    revolve(axis=Axis((-56.4073281825, 65.6883277684, 0), (0, -1, 0)), mode=Mode.SUBTRACT)


with BuildPart() as f1_13:
    add(f1_12.part)

    # F9_s1_t15: cut F9_s1_tool16
    add(f9_s1_tool16.part, mode=Mode.SUBTRACT)


with BuildPart() as f9_s1_tool22:
    # F9_s1_s23 → F9_s1_t24 (new body)
    with BuildSketch(Plane.XZ.offset(-65.6883277684)):
        with Locations((-57.4073281825, 9)):
            Rectangle(F9_S1_S23_W, F9_S1_S23_H)
    extrude(amount=F9_S1_T24_DEPTH)

    # F9_s1_s25 → F9_s1_t26 (revolve, cut)
    with BuildSketch(Plane(origin=(-56.4073281825, 65.6883277684, 8), x_dir=(0.7071067812, 0, -0.7071067812), z_dir=(-0.7071067812, 0, -0.7071067812))):
        with BuildLine():
            ThreePointArc((0, -2), (2, 0), (0, 2))
            Line((0, 2), (0, -2))
        make_face()
    revolve(axis=Axis((-56.4073281825, 65.6883277684, 8), (0, -1, 0)), mode=Mode.SUBTRACT)


with BuildPart() as f1_14:
    add(f1_13.part)

    # F9_s1_t21: cut F9_s1_tool22
    add(f9_s1_tool22.part, mode=Mode.SUBTRACT)


with BuildPart() as f9_s1_tool28:
    # F9_s1_s29 → F9_s1_t30 (new body)
    with BuildSketch(Plane.XY.offset(8)):
        with Locations((-57.4073281825, 82.6883277684)):
            Rectangle(F9_S1_S29_W, F9_S1_S29_H)
    extrude(amount=F9_S1_T30_DEPTH)

    # F9_s1_s31 → F9_s1_t32 (revolve, cut)
    with BuildSketch(Plane(origin=(-56.4073281825, 81.6883277684, 8), x_dir=(0.7071067812, -0.7071067812, 0), z_dir=(-0.7071067812, -0.7071067812, 0))):
        with BuildLine():
            ThreePointArc((0, -2), (2, 0), (0, 2))
            Line((0, 2), (0, -2))
        make_face()
    revolve(axis=Axis((-56.4073281825, 81.6883277684, 8), (0, 0, 1)), mode=Mode.SUBTRACT)


with BuildPart() as f1_15:
    add(f1_14.part)

    # F9_s1_t27: cut F9_s1_tool28
    add(f9_s1_tool28.part, mode=Mode.SUBTRACT)


with BuildPart() as f11:
    # F10 (on Top) → F11 (new body)
    with BuildSketch(Plane.XY):
        with Locations((-44.0662039816, -66.8389573097)):
            Rectangle(F10_W, F10_H)
    extrude(amount=F11_DEPTH)

    # F12 (on face) → F13 (join)
    with BuildSketch(Plane.XY.offset(4)):
        with Locations((-44.0662039816, -53.8389573097)):
            Rectangle(F12_W, F12_H)
        with Locations((-44.0662039816, -79.8389573097)):
            Rectangle(F12_W, F12_H)
    extrude(amount=F13_DEPTH)

    # F15 (on face) → F16 (join)
    with BuildSketch(Plane.YZ.offset(-34.0662039816)):
        Polygon((-77.8389573097, 0), (-77.8389573097, 4), (-77.8389573097, 14), (-81.8389573097, 14), (-81.8389573097, 0), align=None)
        Polygon((-55.8389573097, 14), (-55.8389573097, 4), (-55.8389573097, 0), (-51.8389573097, 0), (-51.8389573097, 14), align=None)
    extrude(amount=F16_DEPTH)

    # F14 (on face) → F17 (join)
    with BuildSketch(Plane(origin=(-54.0662039816, 0, 0), x_dir=(0, -1, 0), z_dir=(-1, 0, 0))):
        Polygon((55.8389573097, 0), (55.8389573097, 4), (55.8389573097, 14), (51.8389573097, 14), (51.8389573097, 0), align=None)
        Polygon((77.8389573097, 14), (77.8389573097, 4), (77.8389573097, 0), (81.8389573097, 0), (81.8389573097, 14), align=None)
    extrude(amount=F17_DEPTH)

    # F19 (on face) → F20 (join)
    with BuildSketch(Plane.XZ.offset(81.8389573097)):
        with Locations((-56.0662039816, 7)):
            Rectangle(F19_W, F19_H)
        with Locations((-32.0662039816, 7)):
            Rectangle(F19_W, F19_H)
    extrude(amount=F20_DEPTH)

    # F18 (on face) → F21 (join)
    with BuildSketch(Plane(origin=(0, -51.8389573097, 0), x_dir=(-1, 0, 0), z_dir=(0, 1, 0))):
        with Locations((32.0662039816, 7)):
            Rectangle(F18_W, F18_H)
        with Locations((56.0662039816, 7)):
            Rectangle(F18_W, F18_H)
    extrude(amount=F21_DEPTH)

    # F22 (on face) → F23 (join)
    with BuildSketch(Plane(origin=(-54.0662039816, 0, 0), x_dir=(0, -1, 0), z_dir=(-1, 0, 0))):
        with Locations((66.8389573097, 8)):
            Rectangle(F22_W, F22_H)
    extrude(amount=-F23_DEPTH)

    # F24 (on face) → F25 (join)
    with BuildSketch(Plane.YZ.offset(-34.0662039816)):
        with Locations((-66.8389573097, 8)):
            Rectangle(F24_W, F24_H)
    extrude(amount=-F25_DEPTH)

    # F26 (on face) + F27 (on face) → F28 (cut, through all)
    with BuildSketch(Plane.YZ.offset(-30.0662039816)):
        with Locations((-91.8389573097, 7)):
            Circle(F26_R)
    with BuildSketch(Plane.YZ.offset(-30.0662039816)):
        with Locations((-41.8389573097, 7)):
            Circle(F27_R)
    extrude(amount=-F28_DEPTH, mode=Mode.SUBTRACT)

    # F29 (size 2 in the source; OpenCascade refuses exactly that, so slightly less here)
    f29_edges = [f11.edges().sort_by_distance(p)[0] for p in [
        (-32.066204, -101.838957, 0),
        (-30.066204, -77.838957, 7),
        (-44.066204, -77.838957, 4),
        (-44.066204, -77.838957, 14),
        (-58.066204, -77.838957, 7),
        (-44.066204, -55.838957, 4),
        (-51.066204, -55.838957, 8),
        (-37.066204, -55.838957, 8),
        (-34.066204, -55.838957, 6),
        (-35.566204, -55.838957, 12),
        (-52.566204, -55.838957, 12),
        (-54.066204, -55.838957, 6),
        (-30.066204, -55.838957, 7),
        (-58.066204, -55.838957, 7),
        (-32.066204, -31.838957, 14),
        (-56.066204, -31.838957, 14),
        (-56.066204, -31.838957, 0),
        (-32.066204, -31.838957, 0),
        (-56.066204, -101.838957, 14),
        (-32.066204, -101.838957, 14),
        (-56.066204, -101.838957, 0),
    ]]
    chamfer(f29_edges, length=F29_SIZE)


solid = f11.part
